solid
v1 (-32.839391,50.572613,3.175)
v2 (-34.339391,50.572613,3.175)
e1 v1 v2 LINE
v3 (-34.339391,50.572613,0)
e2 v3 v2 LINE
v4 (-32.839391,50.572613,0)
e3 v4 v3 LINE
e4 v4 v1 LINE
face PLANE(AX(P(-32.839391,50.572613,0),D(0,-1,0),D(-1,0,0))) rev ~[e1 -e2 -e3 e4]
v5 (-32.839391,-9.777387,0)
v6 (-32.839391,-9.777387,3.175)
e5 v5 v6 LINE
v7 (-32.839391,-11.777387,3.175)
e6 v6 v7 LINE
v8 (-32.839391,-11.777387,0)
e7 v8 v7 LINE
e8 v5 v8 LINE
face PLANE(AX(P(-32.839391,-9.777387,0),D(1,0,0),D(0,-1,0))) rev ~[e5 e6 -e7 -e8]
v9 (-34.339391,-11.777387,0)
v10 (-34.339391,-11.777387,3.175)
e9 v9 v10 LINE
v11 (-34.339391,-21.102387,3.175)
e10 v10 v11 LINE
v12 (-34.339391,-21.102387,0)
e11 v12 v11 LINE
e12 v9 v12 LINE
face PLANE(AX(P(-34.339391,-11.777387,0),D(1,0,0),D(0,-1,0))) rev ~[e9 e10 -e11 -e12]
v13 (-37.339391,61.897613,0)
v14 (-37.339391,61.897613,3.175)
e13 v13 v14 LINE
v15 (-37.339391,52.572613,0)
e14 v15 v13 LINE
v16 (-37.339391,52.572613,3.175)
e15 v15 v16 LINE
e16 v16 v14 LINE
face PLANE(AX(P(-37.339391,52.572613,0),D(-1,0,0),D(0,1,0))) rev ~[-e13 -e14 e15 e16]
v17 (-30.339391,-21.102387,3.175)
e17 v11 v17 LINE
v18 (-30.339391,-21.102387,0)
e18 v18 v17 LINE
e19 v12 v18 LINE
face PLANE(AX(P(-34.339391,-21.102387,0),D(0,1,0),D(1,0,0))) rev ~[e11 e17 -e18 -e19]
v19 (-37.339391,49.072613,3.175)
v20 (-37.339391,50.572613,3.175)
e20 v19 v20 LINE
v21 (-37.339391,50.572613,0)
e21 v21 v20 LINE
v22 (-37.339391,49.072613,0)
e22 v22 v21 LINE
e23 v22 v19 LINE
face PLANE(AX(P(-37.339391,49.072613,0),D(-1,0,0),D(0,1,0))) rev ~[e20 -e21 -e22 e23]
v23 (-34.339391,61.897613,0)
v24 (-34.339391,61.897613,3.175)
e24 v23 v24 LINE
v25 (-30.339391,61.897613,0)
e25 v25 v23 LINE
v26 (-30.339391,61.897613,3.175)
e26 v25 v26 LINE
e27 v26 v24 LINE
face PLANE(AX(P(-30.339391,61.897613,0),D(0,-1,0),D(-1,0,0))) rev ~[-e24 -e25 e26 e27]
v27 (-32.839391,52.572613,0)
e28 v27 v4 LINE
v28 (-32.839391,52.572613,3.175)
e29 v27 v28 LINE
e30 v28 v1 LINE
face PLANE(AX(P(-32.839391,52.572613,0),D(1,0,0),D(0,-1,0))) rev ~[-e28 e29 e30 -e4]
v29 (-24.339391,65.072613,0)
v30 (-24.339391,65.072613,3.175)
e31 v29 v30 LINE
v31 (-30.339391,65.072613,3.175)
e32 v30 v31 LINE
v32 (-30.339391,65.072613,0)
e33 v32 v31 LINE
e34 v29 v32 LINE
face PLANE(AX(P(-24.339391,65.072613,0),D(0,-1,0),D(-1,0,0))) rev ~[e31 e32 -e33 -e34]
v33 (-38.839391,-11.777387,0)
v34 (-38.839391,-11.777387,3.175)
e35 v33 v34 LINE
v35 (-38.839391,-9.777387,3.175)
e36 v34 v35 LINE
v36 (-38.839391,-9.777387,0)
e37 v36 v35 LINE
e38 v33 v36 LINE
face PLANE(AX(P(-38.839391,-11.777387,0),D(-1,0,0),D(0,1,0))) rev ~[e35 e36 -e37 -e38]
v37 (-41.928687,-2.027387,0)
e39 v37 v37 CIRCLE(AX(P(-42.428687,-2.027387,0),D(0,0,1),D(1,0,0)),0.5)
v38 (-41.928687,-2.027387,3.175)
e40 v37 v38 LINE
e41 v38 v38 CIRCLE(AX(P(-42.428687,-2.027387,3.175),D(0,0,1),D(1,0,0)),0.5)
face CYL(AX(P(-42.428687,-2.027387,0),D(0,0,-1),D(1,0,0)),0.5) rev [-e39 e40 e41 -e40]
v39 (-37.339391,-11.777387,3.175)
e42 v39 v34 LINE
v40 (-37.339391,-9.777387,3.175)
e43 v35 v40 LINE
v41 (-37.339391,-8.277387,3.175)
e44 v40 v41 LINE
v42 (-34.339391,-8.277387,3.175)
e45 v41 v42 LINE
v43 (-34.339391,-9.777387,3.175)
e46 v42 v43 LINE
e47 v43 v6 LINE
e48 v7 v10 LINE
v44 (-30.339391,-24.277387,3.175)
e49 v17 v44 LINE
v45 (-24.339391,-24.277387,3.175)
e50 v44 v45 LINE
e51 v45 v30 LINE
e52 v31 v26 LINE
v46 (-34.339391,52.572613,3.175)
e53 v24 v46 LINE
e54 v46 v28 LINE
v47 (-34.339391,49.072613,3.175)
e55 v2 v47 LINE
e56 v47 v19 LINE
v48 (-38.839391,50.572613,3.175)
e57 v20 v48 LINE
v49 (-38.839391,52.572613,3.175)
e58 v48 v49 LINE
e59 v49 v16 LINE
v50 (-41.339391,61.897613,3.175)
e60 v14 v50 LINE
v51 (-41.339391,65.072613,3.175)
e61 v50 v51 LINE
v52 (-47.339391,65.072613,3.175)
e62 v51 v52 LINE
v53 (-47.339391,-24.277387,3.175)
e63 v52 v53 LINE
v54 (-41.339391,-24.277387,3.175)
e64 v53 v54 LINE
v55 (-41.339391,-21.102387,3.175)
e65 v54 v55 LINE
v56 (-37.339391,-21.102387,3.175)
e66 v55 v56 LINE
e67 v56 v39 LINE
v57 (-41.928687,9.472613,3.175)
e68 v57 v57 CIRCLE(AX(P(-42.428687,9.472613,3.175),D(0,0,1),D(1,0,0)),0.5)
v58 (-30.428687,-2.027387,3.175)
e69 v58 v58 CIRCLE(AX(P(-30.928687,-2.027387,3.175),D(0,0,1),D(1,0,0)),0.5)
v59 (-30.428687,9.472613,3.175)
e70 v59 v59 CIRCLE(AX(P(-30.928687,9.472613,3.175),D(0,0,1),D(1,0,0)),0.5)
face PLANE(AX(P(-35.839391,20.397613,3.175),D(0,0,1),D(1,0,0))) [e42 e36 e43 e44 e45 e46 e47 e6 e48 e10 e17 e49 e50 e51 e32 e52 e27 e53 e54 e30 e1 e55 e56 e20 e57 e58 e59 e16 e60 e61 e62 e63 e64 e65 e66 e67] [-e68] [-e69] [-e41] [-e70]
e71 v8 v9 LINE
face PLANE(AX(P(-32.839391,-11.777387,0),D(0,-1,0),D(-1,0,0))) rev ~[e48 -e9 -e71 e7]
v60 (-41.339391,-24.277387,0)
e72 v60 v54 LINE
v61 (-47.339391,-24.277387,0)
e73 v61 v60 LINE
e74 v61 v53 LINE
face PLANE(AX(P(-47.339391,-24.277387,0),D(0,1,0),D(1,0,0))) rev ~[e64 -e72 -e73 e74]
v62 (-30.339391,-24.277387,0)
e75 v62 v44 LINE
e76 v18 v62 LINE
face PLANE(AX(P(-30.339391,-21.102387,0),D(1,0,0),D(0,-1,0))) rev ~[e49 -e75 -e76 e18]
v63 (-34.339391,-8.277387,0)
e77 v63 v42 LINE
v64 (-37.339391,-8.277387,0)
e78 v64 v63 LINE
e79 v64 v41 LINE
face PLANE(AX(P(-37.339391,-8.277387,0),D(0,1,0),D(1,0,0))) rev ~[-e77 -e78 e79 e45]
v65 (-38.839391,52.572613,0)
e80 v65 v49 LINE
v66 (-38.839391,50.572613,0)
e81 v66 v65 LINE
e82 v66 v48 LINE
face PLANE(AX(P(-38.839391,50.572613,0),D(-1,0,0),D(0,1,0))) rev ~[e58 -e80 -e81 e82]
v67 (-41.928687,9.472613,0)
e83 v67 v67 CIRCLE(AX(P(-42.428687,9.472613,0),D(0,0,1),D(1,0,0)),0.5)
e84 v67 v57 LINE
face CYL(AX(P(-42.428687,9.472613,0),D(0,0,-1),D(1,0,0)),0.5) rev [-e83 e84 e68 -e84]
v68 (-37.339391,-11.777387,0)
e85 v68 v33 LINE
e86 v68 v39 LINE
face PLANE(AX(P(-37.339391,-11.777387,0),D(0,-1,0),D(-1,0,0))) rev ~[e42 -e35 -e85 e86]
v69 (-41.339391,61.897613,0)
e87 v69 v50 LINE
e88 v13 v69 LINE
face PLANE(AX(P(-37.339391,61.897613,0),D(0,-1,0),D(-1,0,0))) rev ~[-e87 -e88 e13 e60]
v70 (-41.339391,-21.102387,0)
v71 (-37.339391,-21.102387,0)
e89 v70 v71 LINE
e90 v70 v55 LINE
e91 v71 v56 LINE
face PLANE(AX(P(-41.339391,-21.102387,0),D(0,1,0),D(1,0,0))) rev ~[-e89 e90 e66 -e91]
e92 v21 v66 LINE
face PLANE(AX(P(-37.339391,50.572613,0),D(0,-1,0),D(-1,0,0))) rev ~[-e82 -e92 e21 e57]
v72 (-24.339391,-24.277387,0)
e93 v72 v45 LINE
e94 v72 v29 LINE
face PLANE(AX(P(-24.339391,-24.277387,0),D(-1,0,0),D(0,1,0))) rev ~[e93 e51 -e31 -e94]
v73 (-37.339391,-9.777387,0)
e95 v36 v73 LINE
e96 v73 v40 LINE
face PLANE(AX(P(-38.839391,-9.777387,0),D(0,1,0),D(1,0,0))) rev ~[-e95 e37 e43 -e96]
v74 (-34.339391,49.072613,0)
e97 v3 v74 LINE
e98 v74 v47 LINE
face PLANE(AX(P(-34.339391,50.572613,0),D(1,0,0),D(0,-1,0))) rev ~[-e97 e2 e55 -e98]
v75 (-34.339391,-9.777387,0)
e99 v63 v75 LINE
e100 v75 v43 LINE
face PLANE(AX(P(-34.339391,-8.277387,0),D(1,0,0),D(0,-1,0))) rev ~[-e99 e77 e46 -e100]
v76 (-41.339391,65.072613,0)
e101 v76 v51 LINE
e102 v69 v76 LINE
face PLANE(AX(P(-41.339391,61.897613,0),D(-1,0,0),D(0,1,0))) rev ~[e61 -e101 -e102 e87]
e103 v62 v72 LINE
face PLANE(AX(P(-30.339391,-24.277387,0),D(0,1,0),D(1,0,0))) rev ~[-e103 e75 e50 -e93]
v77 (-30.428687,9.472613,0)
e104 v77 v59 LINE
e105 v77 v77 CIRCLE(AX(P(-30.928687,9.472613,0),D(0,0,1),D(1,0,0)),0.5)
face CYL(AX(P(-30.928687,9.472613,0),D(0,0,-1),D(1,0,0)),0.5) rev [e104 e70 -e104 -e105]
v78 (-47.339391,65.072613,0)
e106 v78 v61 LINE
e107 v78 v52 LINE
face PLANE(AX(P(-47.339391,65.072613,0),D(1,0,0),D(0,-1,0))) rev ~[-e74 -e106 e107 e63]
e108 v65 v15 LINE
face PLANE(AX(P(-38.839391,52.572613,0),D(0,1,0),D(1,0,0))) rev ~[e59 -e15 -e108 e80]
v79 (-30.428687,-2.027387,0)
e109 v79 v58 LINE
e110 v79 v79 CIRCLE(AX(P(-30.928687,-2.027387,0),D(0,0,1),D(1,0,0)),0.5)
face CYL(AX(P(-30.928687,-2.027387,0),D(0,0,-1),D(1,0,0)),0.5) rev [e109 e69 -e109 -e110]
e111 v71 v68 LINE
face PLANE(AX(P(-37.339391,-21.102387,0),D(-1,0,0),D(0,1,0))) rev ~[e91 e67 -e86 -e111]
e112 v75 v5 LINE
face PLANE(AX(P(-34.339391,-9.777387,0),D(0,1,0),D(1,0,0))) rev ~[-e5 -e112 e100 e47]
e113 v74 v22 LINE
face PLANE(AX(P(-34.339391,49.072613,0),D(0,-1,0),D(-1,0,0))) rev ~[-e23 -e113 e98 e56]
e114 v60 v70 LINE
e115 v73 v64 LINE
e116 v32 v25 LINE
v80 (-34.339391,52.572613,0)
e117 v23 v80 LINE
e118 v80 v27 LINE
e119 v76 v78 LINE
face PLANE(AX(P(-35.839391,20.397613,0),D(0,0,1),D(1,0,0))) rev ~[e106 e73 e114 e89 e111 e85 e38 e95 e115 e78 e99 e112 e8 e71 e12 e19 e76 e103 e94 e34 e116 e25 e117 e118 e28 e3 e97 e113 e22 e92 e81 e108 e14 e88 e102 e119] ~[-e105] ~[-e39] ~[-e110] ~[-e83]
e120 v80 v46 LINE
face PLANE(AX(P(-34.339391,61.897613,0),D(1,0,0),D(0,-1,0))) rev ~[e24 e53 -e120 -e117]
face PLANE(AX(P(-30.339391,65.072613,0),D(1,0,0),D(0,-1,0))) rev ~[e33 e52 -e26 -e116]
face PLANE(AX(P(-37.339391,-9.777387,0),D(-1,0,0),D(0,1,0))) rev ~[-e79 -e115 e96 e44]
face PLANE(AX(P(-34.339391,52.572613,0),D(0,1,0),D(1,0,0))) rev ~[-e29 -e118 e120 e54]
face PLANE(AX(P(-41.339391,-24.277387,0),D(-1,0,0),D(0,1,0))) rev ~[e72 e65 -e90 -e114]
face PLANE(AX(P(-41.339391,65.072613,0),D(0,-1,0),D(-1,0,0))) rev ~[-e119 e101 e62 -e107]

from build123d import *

# Parameters (mm, degrees)
F0_R     = 0.5
F1_DEPTH = 3.175


# Not quite as in the source:
# - a length typed as a fraction of an inch, garbled in the dataset ("3 / 203.2 mm" for 3/8 in), is restored


with BuildPart() as f1:
    # F0 (on Top) → F1 (new body)
    with BuildSketch(Plane.XY):
        Polygon((-34.3393906951, 49.0726131633), (-37.3393906951, 49.0726131633), (-37.3393906951, 50.5726131633), (-38.8393906951, 50.5726131633), (-38.8393906951, 52.5726131633), (-37.3393906951, 52.5726131633), (-37.3393906951, 61.8976131633), (-41.3393906951, 61.8976131633), (-41.3393906951, 65.0726131633), (-47.3393906951, 65.0726131633), (-47.3393906951, 61.8976131633), (-47.3393906951, -21.1023868367), (-47.3393906951, -24.2773868367), (-41.3393906951, -24.2773868367), (-41.3393906951, -21.1023868367), (-37.3393906951, -21.1023868367), (-37.3393906951, -11.7773868367), (-38.8393906951, -11.7773868367), (-38.8393906951, -9.7773868367), (-37.3393906951, -9.7773868367), (-37.3393906951, -8.2773868367), (-34.3393906951, -8.2773868367), (-34.3393906951, -9.7773868367), (-32.8393906951, -9.7773868367), (-32.8393906951, -11.7773868367), (-34.3393906951, -11.7773868367), (-34.3393906951, -21.1023868367), (-30.3393906951, -21.1023868367), (-30.3393906951, -24.2773868367), (-24.3393906951, -24.2773868367), (-24.3393906951, -21.1023868367), (-24.3393906951, 61.8976131633), (-24.3393906951, 65.0726131633), (-30.3393906951, 65.0726131633), (-30.3393906951, 61.8976131633), (-34.3393906951, 61.8976131633), (-34.3393906951, 52.5726131633), (-32.8393906951, 52.5726131633), (-32.8393906951, 50.5726131633), (-34.3393906951, 50.5726131633), align=None)
        with Locations((-42.4286872149, -2.0273868367)):
            Circle(F0_R, mode=Mode.SUBTRACT)
        with Locations((-42.4286872149, 9.4726131633)):
            Circle(F0_R, mode=Mode.SUBTRACT)
        with Locations((-30.9286872149, -2.0273868367)):
            Circle(F0_R, mode=Mode.SUBTRACT)
        with Locations((-30.9286872149, 9.4726131633)):
            Circle(F0_R, mode=Mode.SUBTRACT)
    extrude(amount=F1_DEPTH)


solid = f1.part
